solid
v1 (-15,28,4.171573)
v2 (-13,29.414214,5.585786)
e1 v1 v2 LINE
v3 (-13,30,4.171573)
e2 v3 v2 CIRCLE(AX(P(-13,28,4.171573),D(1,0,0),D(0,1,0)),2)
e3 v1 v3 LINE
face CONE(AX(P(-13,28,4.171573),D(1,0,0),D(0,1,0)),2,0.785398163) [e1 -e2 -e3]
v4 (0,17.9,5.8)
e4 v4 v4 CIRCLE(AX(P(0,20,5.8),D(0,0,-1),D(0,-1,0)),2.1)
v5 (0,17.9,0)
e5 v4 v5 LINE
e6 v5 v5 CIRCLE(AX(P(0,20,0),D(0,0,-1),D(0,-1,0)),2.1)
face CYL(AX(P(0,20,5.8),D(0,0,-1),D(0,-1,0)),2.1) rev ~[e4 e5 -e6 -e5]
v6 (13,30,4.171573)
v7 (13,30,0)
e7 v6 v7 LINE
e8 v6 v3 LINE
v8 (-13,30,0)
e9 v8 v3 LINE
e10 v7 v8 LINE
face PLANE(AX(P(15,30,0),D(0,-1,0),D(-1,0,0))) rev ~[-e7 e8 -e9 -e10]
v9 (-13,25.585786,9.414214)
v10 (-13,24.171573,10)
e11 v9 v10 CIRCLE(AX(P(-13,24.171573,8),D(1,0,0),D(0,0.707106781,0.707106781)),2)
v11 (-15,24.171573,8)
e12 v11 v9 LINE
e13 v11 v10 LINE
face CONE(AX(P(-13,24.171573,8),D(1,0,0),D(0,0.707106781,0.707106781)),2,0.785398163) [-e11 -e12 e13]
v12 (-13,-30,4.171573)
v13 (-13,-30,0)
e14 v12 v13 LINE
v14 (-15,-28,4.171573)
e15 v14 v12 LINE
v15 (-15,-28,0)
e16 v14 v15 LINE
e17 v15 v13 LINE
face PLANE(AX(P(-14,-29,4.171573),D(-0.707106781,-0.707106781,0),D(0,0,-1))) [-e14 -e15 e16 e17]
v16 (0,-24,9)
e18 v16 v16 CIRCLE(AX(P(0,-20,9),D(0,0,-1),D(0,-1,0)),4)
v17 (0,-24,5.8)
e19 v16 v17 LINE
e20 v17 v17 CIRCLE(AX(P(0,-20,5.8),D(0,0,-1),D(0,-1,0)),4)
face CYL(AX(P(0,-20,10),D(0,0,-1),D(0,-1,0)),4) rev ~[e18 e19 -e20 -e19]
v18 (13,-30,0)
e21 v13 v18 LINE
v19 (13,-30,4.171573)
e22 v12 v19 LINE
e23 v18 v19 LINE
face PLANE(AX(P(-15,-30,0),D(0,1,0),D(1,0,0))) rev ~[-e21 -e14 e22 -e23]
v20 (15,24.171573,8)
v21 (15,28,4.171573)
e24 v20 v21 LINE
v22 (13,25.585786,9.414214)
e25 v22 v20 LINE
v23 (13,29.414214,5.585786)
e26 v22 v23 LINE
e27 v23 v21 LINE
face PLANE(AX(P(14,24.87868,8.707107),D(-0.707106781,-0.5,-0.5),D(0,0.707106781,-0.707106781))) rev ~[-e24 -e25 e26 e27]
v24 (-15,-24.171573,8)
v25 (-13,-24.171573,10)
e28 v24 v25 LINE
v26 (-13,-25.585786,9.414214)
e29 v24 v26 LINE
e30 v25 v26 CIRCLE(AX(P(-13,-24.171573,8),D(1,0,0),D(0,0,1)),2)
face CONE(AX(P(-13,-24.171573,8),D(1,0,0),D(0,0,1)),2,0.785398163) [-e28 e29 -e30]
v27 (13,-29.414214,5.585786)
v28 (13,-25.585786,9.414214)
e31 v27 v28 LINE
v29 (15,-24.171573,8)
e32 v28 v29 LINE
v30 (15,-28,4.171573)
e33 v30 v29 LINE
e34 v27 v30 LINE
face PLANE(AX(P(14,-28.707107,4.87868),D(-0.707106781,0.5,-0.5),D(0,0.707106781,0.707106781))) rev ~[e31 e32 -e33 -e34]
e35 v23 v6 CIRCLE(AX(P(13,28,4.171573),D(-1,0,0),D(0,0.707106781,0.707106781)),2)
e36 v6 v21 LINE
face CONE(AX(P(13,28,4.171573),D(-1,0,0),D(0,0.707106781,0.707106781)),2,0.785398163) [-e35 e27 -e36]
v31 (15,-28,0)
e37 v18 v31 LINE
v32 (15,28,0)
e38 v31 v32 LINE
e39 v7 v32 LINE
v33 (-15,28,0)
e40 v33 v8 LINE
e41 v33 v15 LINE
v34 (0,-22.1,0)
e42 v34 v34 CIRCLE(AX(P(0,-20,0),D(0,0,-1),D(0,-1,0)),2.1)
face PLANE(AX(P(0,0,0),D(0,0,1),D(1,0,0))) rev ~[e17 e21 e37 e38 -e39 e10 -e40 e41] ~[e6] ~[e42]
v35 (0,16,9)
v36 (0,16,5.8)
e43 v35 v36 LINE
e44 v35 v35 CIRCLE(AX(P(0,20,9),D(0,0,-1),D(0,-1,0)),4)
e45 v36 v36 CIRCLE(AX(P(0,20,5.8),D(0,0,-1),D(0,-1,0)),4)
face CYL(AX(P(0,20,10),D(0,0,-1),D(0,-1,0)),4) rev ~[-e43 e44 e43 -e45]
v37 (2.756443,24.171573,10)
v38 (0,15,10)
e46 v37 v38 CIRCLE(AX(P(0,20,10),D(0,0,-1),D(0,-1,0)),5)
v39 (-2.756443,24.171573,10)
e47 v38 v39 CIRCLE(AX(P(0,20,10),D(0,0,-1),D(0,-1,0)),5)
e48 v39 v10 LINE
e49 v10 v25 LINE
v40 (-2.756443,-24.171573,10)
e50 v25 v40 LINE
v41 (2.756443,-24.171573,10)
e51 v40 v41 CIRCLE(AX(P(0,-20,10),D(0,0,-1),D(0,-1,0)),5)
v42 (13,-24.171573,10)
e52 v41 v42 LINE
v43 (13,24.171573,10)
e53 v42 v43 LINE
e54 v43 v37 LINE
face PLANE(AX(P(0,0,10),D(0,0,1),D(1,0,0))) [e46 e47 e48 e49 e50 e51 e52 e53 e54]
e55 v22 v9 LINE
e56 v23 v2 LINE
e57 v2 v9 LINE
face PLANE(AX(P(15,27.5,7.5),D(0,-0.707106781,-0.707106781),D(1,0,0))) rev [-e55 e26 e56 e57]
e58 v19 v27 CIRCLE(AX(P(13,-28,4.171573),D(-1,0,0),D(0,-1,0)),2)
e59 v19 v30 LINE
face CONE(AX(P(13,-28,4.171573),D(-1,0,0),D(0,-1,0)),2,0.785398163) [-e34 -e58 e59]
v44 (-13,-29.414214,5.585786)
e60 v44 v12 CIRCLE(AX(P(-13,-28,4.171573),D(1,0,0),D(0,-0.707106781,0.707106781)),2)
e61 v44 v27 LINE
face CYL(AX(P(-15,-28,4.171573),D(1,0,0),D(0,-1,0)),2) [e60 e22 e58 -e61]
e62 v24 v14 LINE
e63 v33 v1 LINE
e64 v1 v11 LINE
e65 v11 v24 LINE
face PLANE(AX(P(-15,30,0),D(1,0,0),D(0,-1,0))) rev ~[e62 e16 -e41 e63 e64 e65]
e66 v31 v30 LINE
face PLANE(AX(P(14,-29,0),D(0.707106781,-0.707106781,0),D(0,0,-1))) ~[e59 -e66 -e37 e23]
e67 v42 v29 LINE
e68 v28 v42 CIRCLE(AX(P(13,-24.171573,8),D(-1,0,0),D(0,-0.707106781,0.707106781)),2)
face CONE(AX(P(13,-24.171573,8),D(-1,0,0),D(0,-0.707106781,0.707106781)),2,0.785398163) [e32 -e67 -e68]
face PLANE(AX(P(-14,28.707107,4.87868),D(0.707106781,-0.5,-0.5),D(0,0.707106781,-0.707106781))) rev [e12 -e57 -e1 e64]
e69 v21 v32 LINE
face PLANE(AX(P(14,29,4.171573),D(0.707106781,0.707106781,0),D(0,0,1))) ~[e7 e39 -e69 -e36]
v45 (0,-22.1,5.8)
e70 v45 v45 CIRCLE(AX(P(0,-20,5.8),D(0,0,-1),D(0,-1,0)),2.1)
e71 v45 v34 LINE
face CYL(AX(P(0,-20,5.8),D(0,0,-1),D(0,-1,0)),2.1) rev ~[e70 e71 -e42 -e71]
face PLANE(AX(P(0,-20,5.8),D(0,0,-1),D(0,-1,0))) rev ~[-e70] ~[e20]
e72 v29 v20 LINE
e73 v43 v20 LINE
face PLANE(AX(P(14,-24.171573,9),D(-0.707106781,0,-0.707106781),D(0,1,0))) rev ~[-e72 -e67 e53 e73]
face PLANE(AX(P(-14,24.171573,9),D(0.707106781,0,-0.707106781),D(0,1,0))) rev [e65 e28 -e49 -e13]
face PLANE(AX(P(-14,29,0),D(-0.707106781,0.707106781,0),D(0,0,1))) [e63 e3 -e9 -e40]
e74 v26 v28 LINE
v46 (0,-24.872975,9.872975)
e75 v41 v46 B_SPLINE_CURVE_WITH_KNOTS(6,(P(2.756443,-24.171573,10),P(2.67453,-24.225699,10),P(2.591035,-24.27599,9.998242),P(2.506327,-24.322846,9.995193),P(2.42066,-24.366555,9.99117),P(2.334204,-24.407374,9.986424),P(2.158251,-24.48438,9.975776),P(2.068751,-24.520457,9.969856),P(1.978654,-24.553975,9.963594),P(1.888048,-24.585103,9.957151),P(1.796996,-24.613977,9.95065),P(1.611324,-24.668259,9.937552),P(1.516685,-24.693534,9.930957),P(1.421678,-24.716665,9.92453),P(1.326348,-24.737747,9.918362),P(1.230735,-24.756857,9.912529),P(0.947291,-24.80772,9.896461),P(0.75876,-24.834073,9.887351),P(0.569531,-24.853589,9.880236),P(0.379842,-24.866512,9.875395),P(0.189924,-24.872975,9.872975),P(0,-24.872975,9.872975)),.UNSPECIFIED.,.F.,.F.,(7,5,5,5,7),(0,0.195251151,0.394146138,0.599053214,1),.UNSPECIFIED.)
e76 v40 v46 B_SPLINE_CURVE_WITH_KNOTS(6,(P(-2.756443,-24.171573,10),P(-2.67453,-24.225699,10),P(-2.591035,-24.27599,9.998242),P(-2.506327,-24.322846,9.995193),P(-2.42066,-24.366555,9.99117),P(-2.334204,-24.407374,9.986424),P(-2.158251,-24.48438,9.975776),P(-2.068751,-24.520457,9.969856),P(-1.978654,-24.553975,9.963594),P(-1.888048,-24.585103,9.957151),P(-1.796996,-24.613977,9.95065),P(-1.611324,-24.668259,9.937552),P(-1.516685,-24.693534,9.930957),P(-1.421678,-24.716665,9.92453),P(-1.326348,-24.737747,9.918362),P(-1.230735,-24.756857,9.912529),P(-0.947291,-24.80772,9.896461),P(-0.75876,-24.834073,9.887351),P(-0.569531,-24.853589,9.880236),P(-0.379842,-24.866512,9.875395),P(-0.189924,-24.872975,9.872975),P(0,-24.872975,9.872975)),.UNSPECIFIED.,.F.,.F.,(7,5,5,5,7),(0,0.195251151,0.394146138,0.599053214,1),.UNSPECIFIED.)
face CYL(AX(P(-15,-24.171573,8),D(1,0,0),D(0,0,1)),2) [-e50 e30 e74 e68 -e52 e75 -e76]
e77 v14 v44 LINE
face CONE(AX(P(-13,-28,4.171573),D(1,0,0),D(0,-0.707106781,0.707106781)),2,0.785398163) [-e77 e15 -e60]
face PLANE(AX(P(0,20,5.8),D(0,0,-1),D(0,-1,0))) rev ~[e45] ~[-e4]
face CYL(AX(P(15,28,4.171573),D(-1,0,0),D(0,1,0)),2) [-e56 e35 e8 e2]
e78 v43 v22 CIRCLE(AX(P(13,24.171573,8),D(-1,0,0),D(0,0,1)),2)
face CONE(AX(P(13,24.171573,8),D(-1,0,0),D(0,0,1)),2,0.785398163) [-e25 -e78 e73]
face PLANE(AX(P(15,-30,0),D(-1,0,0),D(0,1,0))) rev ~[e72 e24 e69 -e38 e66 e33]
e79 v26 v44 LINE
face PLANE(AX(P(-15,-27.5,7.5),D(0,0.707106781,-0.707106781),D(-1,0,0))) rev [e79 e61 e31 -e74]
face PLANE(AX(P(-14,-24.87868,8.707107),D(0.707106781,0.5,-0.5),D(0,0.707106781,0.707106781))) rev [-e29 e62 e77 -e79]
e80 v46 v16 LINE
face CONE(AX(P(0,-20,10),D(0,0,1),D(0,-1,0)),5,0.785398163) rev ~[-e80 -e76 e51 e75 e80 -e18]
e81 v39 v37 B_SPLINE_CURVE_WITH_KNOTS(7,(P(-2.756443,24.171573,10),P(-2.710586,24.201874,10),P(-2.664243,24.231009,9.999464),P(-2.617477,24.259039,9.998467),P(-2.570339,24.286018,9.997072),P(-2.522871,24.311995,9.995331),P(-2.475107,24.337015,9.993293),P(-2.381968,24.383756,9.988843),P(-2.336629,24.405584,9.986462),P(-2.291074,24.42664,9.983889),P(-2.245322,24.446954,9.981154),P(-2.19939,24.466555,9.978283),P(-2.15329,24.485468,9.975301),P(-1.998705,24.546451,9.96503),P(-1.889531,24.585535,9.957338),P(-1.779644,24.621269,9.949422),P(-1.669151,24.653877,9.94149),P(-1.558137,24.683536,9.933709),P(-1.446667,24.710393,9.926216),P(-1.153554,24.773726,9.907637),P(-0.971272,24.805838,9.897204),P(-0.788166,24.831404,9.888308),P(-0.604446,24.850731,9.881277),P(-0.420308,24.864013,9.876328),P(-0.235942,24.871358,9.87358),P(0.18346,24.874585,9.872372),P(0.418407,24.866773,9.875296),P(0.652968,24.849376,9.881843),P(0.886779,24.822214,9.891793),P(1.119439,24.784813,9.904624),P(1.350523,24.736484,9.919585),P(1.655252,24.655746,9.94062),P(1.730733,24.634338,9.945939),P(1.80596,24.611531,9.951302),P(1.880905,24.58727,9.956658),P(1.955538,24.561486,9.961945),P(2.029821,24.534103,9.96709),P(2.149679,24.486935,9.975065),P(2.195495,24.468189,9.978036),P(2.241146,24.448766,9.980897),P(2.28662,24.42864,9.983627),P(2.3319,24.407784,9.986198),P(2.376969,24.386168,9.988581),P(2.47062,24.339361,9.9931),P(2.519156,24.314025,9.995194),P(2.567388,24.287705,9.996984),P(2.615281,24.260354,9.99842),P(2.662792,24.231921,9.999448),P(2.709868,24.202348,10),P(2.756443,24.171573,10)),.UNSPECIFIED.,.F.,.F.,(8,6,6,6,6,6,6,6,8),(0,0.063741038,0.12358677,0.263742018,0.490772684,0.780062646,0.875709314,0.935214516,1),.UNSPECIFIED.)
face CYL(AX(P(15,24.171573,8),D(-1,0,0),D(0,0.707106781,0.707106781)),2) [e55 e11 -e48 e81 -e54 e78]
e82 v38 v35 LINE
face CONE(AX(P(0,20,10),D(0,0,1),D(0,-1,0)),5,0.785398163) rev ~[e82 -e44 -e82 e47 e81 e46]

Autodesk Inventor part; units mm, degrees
ref_plane "YZ Plane" through (0, 0, 0) normal (1, 0, 0) x (0, 1, 0)
ref_plane "XZ Plane" through (0, 0, 0) normal (0, 1, 0) x (-1, 0, 0)
ref_plane "XY Plane" through (0, 0, 0) normal (0, 0, 1) x (1, 0, 0)
sketch "スケッチ1" plane through (0, 0, 0) normal (0, 0, 1) x (1, 0, 0)
  line L0 (-15, -30) -> (15, -30)
  line L1 (15, -30) -> (15, 30)
  line L2 (15, 30) -> (-15, 30)
  line L3 (-15, 30) -> (-15, -30)
  line L4 (-15, -30) -> (15, 30) construction
  line L5 (15, -30) -> (-15, 30) construction
  point P0 (0, 0)
  dimension "d0" = 30
  dimension "d1" = 60
extrude "押し出し1" add sketch "スケッチ1" along normal blind 10
chamfer "面取り1" distance 5 angle 45 2 edges at (0, 30, 10) (0, -30, 10)
fillet "フィレット1" radius 2 4 edges at (0, 30, 5) (0, 25, 10) (0, -25, 10) (0, -30, 5)
chamfer "面取り2" distance 2 angle 45 18 edges at (15, 0, 10) (15, 24.9369, 9.8478) (15, 27.5, 7.5) (15, 29.8478, 4.9369) (15, 30, 2.0858) (15, -24.9369, 9.8478) (15, -27.5, 7.5) (15, -29.8478, 4.9369) (15, -30, 2.0858) (-15, 0, 10) (-15, -24.9369, 9.8478) (-15, -27.5, 7.5) (-15, -29.8478, 4.9369) (-15, -30, 2.0858) (-15, 24.9369, 9.8478) (-15, 27.5, 7.5) (-15, 29.8478, 4.9369) (-15, 30, 2.0858)
sketch "スケッチ2" plane through (0, 0, 10) normal (0, 0, 1) x (1, 0, 0)
  line L0 (-13, -24.1716) -> (-13, 24.1716) projected
  line L1 (13, -24.1716) -> (-13, -24.1716) projected
  line L2 (13, 24.1716) -> (13, -24.1716) projected
  line L3 (-13, 24.1716) -> (13, 24.1716) projected
  point P0 (0, 0)
  point P1 (0, 20)
  point P2 (0, -20)
  dimension "d11" = 40
  dimension "d12" = 20
hole "穴1" at (0, 20, 10) at (0, -20, 10) direction (0, 0, -1) diameter 4.2 depth 21.5 counterbore diameter 8 counterbore depth 4.2
chamfer "面取り3" distance 1 angle 45 2 edges at (0, 24, 10) (0, -16, 10)
properties part number "Flame_Cover"
